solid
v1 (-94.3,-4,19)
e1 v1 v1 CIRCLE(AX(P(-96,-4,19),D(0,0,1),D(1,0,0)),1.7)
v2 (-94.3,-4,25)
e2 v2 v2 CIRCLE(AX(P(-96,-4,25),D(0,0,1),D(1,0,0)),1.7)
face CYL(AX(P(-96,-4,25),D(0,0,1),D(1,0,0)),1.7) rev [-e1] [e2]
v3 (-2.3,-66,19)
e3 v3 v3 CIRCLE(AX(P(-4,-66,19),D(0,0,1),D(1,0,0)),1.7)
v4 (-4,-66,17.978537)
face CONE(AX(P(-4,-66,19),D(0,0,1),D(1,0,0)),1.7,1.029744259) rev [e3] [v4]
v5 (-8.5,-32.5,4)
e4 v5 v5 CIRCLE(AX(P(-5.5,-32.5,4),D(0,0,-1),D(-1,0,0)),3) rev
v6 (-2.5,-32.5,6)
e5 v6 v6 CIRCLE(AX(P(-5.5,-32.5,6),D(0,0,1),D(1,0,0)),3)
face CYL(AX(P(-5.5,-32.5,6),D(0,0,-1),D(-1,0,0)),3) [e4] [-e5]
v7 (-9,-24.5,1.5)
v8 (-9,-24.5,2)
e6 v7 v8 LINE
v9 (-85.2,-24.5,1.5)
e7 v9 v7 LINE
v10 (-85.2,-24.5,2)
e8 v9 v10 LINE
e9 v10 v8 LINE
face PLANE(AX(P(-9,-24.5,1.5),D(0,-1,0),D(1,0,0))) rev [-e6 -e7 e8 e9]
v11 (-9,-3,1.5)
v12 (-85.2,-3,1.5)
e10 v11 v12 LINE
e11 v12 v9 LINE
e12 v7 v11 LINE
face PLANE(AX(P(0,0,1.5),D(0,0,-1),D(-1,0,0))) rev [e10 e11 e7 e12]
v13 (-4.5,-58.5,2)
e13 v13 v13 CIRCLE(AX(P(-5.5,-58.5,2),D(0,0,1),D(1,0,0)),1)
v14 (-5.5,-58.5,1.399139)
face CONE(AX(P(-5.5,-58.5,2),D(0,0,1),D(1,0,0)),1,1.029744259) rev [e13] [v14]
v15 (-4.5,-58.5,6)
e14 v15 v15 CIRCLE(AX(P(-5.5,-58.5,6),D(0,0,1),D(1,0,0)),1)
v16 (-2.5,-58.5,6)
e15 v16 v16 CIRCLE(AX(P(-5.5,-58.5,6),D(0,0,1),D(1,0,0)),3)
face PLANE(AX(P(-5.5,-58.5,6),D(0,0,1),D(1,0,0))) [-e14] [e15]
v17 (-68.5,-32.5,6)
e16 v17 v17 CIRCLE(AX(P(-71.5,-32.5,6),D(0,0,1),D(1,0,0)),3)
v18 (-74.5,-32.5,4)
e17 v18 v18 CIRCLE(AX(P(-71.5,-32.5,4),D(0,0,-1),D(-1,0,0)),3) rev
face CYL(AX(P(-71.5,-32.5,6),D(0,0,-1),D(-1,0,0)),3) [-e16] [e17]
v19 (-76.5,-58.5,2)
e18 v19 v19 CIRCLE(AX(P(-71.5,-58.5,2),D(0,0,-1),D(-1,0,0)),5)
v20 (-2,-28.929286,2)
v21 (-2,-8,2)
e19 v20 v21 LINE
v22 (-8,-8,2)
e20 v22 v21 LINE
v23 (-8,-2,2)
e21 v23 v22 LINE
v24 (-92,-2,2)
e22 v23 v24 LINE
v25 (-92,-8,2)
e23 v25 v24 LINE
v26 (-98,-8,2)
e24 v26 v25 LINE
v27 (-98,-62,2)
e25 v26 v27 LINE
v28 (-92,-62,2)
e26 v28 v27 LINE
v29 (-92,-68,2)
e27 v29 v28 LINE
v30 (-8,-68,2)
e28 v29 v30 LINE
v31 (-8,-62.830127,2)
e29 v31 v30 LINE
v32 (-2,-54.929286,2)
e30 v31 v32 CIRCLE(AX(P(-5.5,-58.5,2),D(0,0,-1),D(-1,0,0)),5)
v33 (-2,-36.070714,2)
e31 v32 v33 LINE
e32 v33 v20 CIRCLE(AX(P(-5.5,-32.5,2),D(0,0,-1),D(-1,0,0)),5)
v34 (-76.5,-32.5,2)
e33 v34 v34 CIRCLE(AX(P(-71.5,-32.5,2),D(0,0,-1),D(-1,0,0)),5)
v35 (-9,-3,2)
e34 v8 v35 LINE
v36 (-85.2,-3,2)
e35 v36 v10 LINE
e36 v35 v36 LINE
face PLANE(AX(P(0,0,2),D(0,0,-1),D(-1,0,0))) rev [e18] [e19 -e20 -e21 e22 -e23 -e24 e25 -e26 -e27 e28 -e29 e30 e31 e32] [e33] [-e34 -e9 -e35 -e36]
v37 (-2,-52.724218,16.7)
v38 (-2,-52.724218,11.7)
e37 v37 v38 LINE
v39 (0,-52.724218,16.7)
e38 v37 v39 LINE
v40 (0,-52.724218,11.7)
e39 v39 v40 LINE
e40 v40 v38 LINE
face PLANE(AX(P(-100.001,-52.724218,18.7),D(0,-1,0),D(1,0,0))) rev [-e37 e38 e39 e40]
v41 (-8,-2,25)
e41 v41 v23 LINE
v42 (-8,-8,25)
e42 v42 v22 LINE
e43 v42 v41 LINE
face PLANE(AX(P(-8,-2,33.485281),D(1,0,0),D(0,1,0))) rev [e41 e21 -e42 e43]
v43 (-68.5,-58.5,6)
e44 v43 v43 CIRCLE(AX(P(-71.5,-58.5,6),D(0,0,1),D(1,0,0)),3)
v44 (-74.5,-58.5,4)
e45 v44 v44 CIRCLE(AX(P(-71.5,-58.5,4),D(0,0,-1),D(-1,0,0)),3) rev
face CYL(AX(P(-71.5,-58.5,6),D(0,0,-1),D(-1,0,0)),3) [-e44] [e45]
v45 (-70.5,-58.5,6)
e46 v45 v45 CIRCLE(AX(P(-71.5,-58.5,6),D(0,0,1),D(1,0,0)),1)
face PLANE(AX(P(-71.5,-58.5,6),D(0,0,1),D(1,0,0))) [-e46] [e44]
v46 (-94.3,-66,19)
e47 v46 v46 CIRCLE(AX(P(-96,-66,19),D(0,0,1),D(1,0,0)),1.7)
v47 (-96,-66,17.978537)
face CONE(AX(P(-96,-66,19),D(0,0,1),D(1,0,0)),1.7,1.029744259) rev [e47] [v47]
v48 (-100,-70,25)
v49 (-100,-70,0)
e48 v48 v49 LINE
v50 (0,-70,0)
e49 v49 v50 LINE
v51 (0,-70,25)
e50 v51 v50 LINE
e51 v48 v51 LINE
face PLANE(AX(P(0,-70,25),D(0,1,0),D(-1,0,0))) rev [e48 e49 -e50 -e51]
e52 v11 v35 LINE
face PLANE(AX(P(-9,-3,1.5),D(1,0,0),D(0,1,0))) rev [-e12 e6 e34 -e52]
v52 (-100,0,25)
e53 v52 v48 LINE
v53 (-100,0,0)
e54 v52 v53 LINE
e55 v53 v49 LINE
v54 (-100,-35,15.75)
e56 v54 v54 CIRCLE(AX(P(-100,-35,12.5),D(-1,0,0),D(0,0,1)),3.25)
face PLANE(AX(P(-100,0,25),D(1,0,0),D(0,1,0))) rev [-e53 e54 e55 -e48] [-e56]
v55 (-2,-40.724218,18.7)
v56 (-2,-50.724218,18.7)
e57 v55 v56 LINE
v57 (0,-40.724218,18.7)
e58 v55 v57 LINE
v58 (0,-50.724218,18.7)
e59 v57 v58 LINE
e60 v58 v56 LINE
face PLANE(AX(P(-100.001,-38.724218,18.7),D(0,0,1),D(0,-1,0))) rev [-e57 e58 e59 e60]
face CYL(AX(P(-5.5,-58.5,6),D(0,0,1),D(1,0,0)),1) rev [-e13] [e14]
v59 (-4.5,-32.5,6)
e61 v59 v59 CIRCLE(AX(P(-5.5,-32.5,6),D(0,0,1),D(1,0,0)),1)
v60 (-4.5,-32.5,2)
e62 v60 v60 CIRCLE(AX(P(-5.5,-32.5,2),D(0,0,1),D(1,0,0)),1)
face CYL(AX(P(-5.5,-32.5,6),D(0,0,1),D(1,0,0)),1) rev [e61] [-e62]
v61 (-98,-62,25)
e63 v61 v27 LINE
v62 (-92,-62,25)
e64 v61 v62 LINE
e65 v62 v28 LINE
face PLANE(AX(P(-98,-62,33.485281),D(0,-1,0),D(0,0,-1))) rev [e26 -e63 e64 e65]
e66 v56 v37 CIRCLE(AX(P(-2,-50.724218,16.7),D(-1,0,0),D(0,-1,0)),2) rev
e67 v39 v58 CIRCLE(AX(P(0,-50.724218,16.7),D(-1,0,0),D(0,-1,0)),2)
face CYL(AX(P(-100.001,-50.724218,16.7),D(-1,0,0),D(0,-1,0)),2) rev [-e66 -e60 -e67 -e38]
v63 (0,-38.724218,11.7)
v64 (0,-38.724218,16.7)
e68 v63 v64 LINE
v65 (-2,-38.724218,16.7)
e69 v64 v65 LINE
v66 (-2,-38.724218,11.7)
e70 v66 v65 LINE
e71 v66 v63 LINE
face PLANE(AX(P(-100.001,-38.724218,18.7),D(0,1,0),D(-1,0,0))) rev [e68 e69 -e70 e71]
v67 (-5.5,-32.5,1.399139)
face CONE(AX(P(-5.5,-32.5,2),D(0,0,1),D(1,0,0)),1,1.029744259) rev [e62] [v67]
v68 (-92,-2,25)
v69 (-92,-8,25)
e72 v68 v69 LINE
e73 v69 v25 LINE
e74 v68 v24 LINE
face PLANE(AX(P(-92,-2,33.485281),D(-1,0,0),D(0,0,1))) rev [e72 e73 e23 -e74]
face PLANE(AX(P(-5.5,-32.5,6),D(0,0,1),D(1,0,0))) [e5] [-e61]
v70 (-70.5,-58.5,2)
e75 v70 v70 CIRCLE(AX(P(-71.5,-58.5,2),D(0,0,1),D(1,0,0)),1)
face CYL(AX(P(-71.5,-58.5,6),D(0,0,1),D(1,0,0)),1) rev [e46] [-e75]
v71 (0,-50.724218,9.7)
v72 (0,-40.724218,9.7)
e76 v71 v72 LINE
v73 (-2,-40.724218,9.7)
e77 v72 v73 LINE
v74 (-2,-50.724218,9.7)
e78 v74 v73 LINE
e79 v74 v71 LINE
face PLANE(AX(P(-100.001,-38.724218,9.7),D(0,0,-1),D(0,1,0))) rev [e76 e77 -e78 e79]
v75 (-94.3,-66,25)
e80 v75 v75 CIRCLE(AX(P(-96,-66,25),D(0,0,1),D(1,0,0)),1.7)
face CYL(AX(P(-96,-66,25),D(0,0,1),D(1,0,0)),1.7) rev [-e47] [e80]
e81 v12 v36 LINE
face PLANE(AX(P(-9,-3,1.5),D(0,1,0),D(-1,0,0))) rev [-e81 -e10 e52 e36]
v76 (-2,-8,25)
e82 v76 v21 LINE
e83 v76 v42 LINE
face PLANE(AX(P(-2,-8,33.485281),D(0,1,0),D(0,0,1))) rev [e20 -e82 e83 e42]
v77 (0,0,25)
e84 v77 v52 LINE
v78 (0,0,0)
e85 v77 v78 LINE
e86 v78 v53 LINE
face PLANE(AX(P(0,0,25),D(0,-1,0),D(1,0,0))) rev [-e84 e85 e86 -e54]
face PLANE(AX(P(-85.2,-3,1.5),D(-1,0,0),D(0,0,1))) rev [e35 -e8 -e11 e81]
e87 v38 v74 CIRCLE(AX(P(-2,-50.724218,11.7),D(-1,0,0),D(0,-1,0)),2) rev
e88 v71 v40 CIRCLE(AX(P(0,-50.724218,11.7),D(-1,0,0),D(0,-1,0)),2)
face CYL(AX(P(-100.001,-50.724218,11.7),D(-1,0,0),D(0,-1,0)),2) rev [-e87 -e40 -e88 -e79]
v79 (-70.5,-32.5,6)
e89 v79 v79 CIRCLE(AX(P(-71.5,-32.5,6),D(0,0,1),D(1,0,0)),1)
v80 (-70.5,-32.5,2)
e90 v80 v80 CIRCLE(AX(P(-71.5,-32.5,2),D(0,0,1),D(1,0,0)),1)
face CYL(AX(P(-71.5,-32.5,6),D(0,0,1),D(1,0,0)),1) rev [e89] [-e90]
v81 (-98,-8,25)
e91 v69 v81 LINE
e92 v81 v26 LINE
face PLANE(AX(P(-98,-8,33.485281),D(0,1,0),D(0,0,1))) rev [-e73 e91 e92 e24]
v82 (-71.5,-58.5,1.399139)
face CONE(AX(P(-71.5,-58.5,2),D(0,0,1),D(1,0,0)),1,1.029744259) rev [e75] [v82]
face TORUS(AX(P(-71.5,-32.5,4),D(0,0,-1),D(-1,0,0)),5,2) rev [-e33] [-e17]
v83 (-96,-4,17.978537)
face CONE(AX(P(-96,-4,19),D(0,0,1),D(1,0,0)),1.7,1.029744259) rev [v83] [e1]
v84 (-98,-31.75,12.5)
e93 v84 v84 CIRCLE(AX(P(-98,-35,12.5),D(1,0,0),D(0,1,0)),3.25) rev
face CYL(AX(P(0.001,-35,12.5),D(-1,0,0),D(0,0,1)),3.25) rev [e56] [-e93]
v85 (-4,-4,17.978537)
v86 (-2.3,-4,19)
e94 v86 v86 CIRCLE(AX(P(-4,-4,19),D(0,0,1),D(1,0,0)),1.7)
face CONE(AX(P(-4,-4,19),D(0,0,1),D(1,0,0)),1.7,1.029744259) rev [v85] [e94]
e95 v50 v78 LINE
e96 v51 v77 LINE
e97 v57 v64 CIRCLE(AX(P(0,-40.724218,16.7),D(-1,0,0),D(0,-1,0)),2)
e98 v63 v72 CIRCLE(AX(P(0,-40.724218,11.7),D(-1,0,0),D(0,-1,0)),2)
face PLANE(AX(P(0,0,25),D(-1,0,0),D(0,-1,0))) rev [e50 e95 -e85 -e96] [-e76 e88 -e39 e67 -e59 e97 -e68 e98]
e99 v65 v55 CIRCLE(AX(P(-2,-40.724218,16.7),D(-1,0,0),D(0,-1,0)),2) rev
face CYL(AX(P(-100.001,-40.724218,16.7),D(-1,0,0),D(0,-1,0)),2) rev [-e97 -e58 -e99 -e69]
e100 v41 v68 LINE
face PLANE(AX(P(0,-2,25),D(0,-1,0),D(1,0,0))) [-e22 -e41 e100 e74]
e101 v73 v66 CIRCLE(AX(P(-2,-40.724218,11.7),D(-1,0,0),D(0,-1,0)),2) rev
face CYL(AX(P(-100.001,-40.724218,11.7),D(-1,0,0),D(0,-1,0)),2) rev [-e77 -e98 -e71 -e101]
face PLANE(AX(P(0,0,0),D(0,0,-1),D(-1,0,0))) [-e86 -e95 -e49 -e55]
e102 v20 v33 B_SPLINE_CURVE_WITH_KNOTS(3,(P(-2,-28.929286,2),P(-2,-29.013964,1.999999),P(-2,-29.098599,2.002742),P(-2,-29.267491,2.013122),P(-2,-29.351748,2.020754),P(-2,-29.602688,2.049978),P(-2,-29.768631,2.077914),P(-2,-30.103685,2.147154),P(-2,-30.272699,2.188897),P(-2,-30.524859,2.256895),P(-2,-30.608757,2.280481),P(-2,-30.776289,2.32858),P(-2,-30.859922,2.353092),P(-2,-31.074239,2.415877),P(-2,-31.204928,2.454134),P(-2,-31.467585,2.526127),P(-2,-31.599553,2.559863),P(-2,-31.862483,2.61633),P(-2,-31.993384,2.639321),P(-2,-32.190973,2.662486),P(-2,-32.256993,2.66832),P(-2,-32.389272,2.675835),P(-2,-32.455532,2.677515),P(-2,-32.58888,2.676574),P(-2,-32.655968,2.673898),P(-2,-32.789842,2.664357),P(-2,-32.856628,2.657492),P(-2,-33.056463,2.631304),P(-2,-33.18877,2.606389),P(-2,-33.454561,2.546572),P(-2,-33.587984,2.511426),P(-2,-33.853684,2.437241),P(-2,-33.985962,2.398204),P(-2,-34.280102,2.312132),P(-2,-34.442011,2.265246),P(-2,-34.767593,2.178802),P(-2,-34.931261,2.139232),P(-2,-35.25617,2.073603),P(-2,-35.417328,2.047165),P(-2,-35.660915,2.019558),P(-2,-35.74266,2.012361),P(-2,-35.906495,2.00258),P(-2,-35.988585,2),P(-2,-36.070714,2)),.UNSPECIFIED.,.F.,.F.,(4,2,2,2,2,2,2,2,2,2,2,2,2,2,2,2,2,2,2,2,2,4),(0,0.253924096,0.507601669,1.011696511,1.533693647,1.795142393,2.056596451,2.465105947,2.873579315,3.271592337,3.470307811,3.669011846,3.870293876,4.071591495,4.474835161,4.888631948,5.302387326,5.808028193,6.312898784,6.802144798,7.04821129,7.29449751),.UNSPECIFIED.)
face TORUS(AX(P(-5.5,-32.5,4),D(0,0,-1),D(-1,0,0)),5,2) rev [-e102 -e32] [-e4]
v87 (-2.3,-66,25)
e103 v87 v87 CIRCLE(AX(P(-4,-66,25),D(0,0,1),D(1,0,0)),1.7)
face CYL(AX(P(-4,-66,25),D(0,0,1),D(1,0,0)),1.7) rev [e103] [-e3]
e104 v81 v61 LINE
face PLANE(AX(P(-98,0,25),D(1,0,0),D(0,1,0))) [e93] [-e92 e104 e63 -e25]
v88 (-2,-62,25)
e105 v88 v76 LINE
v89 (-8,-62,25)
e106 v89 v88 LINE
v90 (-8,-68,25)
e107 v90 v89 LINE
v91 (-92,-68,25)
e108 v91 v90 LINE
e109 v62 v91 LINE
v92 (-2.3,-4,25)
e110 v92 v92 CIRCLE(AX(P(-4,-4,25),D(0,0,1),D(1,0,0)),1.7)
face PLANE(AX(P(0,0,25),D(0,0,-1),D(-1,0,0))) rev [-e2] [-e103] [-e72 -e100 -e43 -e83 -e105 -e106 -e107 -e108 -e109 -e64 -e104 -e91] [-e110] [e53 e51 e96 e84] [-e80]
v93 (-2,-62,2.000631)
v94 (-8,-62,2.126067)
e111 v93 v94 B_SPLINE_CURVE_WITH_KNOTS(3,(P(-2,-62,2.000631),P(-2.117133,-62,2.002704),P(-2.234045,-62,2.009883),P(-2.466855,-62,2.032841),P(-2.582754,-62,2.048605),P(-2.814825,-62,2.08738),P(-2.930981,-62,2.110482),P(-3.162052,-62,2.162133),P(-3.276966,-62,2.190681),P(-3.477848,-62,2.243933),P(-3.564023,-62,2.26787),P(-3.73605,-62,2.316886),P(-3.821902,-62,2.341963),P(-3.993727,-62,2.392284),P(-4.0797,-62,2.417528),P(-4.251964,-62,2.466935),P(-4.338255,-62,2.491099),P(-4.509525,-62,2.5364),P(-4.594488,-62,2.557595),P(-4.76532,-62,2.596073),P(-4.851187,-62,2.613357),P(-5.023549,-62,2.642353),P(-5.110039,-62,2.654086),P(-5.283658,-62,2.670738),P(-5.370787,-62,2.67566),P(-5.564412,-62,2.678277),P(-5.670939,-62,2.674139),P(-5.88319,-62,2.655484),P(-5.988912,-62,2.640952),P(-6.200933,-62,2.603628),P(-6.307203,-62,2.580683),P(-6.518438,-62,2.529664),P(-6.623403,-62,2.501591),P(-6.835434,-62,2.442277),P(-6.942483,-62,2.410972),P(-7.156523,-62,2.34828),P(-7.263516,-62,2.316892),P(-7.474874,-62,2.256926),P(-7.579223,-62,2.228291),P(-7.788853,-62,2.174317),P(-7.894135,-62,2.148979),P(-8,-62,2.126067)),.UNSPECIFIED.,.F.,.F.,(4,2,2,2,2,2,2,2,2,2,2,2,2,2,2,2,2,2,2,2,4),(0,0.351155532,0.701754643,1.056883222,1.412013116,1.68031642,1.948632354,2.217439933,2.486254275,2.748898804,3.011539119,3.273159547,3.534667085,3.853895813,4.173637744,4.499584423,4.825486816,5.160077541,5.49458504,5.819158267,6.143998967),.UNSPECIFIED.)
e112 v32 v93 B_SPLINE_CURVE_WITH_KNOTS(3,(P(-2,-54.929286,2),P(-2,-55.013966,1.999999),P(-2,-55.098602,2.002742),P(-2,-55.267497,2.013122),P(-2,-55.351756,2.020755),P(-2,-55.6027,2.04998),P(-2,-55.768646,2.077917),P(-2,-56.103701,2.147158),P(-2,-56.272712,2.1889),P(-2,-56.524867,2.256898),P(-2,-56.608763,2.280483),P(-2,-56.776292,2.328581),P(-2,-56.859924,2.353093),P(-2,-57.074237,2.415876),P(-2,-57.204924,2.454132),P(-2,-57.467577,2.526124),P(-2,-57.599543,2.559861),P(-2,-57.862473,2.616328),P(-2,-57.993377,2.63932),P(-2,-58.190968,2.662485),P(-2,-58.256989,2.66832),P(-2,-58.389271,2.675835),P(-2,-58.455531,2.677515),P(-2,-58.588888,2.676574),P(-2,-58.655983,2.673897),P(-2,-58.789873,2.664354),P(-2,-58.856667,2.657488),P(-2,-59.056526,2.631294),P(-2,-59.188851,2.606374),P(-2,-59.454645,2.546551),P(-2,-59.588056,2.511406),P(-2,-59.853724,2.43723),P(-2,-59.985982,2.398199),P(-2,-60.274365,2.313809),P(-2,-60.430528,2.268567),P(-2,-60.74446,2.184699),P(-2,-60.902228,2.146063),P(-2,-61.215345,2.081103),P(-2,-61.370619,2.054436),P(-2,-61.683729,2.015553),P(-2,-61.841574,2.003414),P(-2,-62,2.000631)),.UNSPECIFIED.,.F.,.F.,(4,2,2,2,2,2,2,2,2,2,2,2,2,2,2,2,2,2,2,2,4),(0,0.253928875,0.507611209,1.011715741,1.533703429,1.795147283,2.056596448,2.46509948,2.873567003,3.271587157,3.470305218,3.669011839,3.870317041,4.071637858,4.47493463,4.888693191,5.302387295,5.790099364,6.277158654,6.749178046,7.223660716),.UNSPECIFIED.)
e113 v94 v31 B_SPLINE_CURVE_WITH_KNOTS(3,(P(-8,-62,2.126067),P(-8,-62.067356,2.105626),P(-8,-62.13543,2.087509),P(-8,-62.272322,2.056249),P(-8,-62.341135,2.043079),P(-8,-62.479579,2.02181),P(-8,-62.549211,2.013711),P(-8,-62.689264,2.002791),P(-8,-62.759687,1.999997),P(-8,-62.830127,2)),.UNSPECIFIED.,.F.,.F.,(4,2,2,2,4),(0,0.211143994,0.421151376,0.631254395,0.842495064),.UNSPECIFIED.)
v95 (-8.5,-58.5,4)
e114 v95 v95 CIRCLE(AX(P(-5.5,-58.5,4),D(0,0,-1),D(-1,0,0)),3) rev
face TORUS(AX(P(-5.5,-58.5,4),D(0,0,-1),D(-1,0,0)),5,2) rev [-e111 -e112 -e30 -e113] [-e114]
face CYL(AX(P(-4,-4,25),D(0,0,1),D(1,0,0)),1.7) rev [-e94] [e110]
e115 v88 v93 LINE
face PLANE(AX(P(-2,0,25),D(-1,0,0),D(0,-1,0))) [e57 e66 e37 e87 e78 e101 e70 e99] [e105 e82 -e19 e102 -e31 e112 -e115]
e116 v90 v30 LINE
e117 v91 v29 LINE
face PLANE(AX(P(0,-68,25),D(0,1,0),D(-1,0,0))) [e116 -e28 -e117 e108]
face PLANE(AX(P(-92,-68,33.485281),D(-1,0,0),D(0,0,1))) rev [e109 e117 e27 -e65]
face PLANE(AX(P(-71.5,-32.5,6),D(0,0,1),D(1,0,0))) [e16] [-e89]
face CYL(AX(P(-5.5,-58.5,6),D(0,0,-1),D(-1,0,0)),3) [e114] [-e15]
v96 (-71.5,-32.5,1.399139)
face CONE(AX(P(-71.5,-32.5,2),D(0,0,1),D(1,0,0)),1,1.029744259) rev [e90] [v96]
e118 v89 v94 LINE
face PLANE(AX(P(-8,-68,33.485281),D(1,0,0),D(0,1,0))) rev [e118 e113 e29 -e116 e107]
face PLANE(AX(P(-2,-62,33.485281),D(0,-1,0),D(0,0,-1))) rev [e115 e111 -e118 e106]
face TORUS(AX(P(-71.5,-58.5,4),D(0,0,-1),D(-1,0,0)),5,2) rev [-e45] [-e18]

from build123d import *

# Parameters (mm, degrees)
SKIZZE1_W                              = 100
SKIZZE1_H                              = 70
AUFSATZ_LINEAR_AUSTRAGEN1_DEPTH        = 25
WANDUNG1_T                             = -2
SKIZZE2_W                              = 6
SKIZZE2_H                              = 6
AUFSATZ_LINEAR_AUSTRAGEN2_DEPTH        = 23
SKIZZE5_W                              = 76.2
SKIZZE5_H                              = 21.5
SCHNITT_LINEAR_AUSTRAGEN3_DEPTH        = 0.5
SKIZZE6_R                              = 3
AUFSATZ_LINEAR_AUSTRAGEN7_DEPTH        = 4
F_2_0_2_DURCHMESSER_BOHRUNG1_D         = 2
F_2_0_2_DURCHMESSER_BOHRUNG1_DEPTH     = 4
F_2_0_2_DURCHMESSER_BOHRUNG1_TIP       = 0.600860619
SCHNITT_LINEAR_AUSTRAGEN_USB_REACH     = 126.599
SKIZZE3_W                              = 9
SKIZZE3_H                              = 14
SCHNITT_LINEAR_AUSTRAGEN_ANTENNE_REACH = 126.599
SKIZZE4_R                              = 3.25
F_3_4_3_4_DURCHMESSER_BOHRUNG1_D       = 3.4
F_3_4_3_4_DURCHMESSER_BOHRUNG1_DEPTH   = 6
F_3_4_3_4_DURCHMESSER_BOHRUNG1_TIP     = 1.021463052
VERRUNDUNG1_R                          = 2
VERRUNDUNG2_R                          = 2


with BuildPart() as part:
    # Skizze1 → Aufsatz-Linear austragen1 (new body)
    with BuildSketch(Plane.XY):
        with Locations((-50, -35)):
            Rectangle(SKIZZE1_W, SKIZZE1_H)
    extrude(amount=AUFSATZ_LINEAR_AUSTRAGEN1_DEPTH)

    # Wandung1
    wandung1_openings = [part.faces().sort_by_distance(p)[0] for p in [
        (-50, -35, 25),
    ]]
    offset(amount=WANDUNG1_T, openings=wandung1_openings, kind=Kind.INTERSECTION)

    # Skizze2 → Aufsatz-Linear austragen2 (add)
    with BuildSketch(Plane.XY.offset(2)):
        with Locations((-95, -5)):
            Rectangle(SKIZZE2_W, SKIZZE2_H)
        with Locations((-5, -5)):
            Rectangle(SKIZZE2_W, SKIZZE2_H)
        with Locations((-5, -65)):
            Rectangle(SKIZZE2_W, SKIZZE2_H)
        with Locations((-95, -65)):
            Rectangle(SKIZZE2_W, SKIZZE2_H)
    extrude(amount=AUFSATZ_LINEAR_AUSTRAGEN2_DEPTH)

    # Skizze5 → Schnitt-Linear austragen3 (cut)
    with BuildSketch(Plane.XY.offset(2)):
        with Locations((-47.1, -13.75)):
            Rectangle(SKIZZE5_W, SKIZZE5_H)
    extrude(amount=-SCHNITT_LINEAR_AUSTRAGEN3_DEPTH, mode=Mode.SUBTRACT)

    # Skizze6 → Aufsatz-Linear austragen7 (add)
    with BuildSketch(Plane.XY.offset(2)):
        with Locations(Location((-5.5, -58.5, 0), (0, 0, 180))):
            Circle(SKIZZE6_R)
        with Locations(Location((-5.5, -32.5, 0), (0, 0, 180))):
            Circle(SKIZZE6_R)
        with Locations(Location((-71.5, -32.5, 0), (0, 0, 180))):
            Circle(SKIZZE6_R)
        with Locations(Location((-71.5, -58.5, 0), (0, 0, 180))):
            Circle(SKIZZE6_R)
    extrude(amount=AUFSATZ_LINEAR_AUSTRAGEN7_DEPTH)

    # Ø2.0 (2) Durchmesser Bohrung1
    with Locations(Plane.XY.offset(6)):
        with Locations((-71.5, -32.5), (-71.5, -58.5), (-5.5, -32.5), (-5.5, -58.5)):
            Hole(F_2_0_2_DURCHMESSER_BOHRUNG1_D / 2, depth=F_2_0_2_DURCHMESSER_BOHRUNG1_DEPTH)
            with Locations((0, 0, -(F_2_0_2_DURCHMESSER_BOHRUNG1_DEPTH + F_2_0_2_DURCHMESSER_BOHRUNG1_TIP / 2))):  # 118° drill point
                Cone(0, F_2_0_2_DURCHMESSER_BOHRUNG1_D / 2, F_2_0_2_DURCHMESSER_BOHRUNG1_TIP, mode=Mode.SUBTRACT)

    # Skizze3 → Schnitt-Linear austragen USB (cut, up to next)
    with BuildSketch(Plane(origin=(0, 0, 0), x_dir=(0, 0, -1), z_dir=(1, 0, 0)), mode=Mode.PRIVATE) as schnitt_linear_austragen_usb_sk1:
        with Locations((-14.2, -45.724218214)):
            Rectangle(SKIZZE3_W, SKIZZE3_H)
    schnitt_linear_austragen_usb_tool1 = extrude(schnitt_linear_austragen_usb_sk1.sketch, amount=-SCHNITT_LINEAR_AUSTRAGEN_USB_REACH, mode=Mode.PRIVATE) & part.part
    add(schnitt_linear_austragen_usb_tool1.solids().sort_by_distance((0, -45.724218, 14.2))[0], mode=Mode.SUBTRACT)

    # Skizze4 → Schnitt-Linear austragen Antenne (cut, up to next)
    with BuildSketch(Plane.ZY.offset(100), mode=Mode.PRIVATE) as schnitt_linear_austragen_antenne_sk1:
        with Locations((12.5, -35)):
            Circle(SKIZZE4_R)
    schnitt_linear_austragen_antenne_tool1 = extrude(schnitt_linear_austragen_antenne_sk1.sketch, amount=-SCHNITT_LINEAR_AUSTRAGEN_ANTENNE_REACH, mode=Mode.PRIVATE) & part.part
    add(schnitt_linear_austragen_antenne_tool1.solids().sort_by_distance((-100, -35, 12.5))[0], mode=Mode.SUBTRACT)

    # Ø3.4 (3.4) Durchmesser Bohrung1
    with Locations(Plane.XY.offset(25)):
        with Locations((-96, -4), (-4, -4), (-4, -66), (-96, -66)):
            Hole(F_3_4_3_4_DURCHMESSER_BOHRUNG1_D / 2, depth=F_3_4_3_4_DURCHMESSER_BOHRUNG1_DEPTH)
            with Locations((0, 0, -(F_3_4_3_4_DURCHMESSER_BOHRUNG1_DEPTH + F_3_4_3_4_DURCHMESSER_BOHRUNG1_TIP / 2))):  # 118° drill point
                Cone(0, F_3_4_3_4_DURCHMESSER_BOHRUNG1_D / 2, F_3_4_3_4_DURCHMESSER_BOHRUNG1_TIP, mode=Mode.SUBTRACT)

    # Verrundung1
    verrundung1_edges = [part.edges().sort_by_distance(p)[0] for p in [
        (-1, -38.724218214, 9.7),
        (-1, -52.724218214, 9.7),
        (-1, -52.724218214, 18.7),
        (-1, -38.724218214, 18.7),
    ]]
    fillet(verrundung1_edges, radius=VERRUNDUNG1_R)

    # Verrundung2
    # the kernel refuses this fillet: 2 mm, written as the material it adds along each edge
    with BuildSketch(Plane(origin=(-5.5, -58.5, 2), x_dir=(-1, 0, 0), z_dir=(0, 1, 0))) as verrundung2_piece_1:
        with BuildLine():
            CenterArc((3 + VERRUNDUNG2_R, VERRUNDUNG2_R), VERRUNDUNG2_R, 180, 90)
            Line((3, VERRUNDUNG2_R), (3, 0))
            Line((3, 0), (3 + VERRUNDUNG2_R, 0))
        make_face()
    revolve(axis=Axis((-5.5, -58.5, 2), (0, 0, 1)))
    with BuildSketch(Plane(origin=(-71.5, -32.5, 2), x_dir=(-1, 0, 0), z_dir=(0, 1, 0))) as verrundung2_piece_2:
        with BuildLine():
            CenterArc((3 + VERRUNDUNG2_R, VERRUNDUNG2_R), VERRUNDUNG2_R, 180, 90)
            Line((3, VERRUNDUNG2_R), (3, 0))
            Line((3, 0), (3 + VERRUNDUNG2_R, 0))
        make_face()
    revolve(axis=Axis((-71.5, -32.5, 2), (0, 0, 1)))
    with BuildSketch(Plane(origin=(-5.5, -32.5, 2), x_dir=(-1, 0, 0), z_dir=(0, 1, 0))) as verrundung2_piece_3:
        with BuildLine():
            CenterArc((3 + VERRUNDUNG2_R, VERRUNDUNG2_R), VERRUNDUNG2_R, 180, 90)
            Line((3, VERRUNDUNG2_R), (3, 0))
            Line((3, 0), (3 + VERRUNDUNG2_R, 0))
        make_face()
    revolve(axis=Axis((-5.5, -32.5, 2), (0, 0, 1)))
    with BuildSketch(Plane(origin=(-71.5, -58.5, 2), x_dir=(-1, 0, 0), z_dir=(0, 1, 0))) as verrundung2_piece_4:
        with BuildLine():
            CenterArc((3 + VERRUNDUNG2_R, VERRUNDUNG2_R), VERRUNDUNG2_R, 180, 90)
            Line((3, VERRUNDUNG2_R), (3, 0))
            Line((3, 0), (3 + VERRUNDUNG2_R, 0))
        make_face()
    revolve(axis=Axis((-71.5, -58.5, 2), (0, 0, 1)))


solid = part.part
